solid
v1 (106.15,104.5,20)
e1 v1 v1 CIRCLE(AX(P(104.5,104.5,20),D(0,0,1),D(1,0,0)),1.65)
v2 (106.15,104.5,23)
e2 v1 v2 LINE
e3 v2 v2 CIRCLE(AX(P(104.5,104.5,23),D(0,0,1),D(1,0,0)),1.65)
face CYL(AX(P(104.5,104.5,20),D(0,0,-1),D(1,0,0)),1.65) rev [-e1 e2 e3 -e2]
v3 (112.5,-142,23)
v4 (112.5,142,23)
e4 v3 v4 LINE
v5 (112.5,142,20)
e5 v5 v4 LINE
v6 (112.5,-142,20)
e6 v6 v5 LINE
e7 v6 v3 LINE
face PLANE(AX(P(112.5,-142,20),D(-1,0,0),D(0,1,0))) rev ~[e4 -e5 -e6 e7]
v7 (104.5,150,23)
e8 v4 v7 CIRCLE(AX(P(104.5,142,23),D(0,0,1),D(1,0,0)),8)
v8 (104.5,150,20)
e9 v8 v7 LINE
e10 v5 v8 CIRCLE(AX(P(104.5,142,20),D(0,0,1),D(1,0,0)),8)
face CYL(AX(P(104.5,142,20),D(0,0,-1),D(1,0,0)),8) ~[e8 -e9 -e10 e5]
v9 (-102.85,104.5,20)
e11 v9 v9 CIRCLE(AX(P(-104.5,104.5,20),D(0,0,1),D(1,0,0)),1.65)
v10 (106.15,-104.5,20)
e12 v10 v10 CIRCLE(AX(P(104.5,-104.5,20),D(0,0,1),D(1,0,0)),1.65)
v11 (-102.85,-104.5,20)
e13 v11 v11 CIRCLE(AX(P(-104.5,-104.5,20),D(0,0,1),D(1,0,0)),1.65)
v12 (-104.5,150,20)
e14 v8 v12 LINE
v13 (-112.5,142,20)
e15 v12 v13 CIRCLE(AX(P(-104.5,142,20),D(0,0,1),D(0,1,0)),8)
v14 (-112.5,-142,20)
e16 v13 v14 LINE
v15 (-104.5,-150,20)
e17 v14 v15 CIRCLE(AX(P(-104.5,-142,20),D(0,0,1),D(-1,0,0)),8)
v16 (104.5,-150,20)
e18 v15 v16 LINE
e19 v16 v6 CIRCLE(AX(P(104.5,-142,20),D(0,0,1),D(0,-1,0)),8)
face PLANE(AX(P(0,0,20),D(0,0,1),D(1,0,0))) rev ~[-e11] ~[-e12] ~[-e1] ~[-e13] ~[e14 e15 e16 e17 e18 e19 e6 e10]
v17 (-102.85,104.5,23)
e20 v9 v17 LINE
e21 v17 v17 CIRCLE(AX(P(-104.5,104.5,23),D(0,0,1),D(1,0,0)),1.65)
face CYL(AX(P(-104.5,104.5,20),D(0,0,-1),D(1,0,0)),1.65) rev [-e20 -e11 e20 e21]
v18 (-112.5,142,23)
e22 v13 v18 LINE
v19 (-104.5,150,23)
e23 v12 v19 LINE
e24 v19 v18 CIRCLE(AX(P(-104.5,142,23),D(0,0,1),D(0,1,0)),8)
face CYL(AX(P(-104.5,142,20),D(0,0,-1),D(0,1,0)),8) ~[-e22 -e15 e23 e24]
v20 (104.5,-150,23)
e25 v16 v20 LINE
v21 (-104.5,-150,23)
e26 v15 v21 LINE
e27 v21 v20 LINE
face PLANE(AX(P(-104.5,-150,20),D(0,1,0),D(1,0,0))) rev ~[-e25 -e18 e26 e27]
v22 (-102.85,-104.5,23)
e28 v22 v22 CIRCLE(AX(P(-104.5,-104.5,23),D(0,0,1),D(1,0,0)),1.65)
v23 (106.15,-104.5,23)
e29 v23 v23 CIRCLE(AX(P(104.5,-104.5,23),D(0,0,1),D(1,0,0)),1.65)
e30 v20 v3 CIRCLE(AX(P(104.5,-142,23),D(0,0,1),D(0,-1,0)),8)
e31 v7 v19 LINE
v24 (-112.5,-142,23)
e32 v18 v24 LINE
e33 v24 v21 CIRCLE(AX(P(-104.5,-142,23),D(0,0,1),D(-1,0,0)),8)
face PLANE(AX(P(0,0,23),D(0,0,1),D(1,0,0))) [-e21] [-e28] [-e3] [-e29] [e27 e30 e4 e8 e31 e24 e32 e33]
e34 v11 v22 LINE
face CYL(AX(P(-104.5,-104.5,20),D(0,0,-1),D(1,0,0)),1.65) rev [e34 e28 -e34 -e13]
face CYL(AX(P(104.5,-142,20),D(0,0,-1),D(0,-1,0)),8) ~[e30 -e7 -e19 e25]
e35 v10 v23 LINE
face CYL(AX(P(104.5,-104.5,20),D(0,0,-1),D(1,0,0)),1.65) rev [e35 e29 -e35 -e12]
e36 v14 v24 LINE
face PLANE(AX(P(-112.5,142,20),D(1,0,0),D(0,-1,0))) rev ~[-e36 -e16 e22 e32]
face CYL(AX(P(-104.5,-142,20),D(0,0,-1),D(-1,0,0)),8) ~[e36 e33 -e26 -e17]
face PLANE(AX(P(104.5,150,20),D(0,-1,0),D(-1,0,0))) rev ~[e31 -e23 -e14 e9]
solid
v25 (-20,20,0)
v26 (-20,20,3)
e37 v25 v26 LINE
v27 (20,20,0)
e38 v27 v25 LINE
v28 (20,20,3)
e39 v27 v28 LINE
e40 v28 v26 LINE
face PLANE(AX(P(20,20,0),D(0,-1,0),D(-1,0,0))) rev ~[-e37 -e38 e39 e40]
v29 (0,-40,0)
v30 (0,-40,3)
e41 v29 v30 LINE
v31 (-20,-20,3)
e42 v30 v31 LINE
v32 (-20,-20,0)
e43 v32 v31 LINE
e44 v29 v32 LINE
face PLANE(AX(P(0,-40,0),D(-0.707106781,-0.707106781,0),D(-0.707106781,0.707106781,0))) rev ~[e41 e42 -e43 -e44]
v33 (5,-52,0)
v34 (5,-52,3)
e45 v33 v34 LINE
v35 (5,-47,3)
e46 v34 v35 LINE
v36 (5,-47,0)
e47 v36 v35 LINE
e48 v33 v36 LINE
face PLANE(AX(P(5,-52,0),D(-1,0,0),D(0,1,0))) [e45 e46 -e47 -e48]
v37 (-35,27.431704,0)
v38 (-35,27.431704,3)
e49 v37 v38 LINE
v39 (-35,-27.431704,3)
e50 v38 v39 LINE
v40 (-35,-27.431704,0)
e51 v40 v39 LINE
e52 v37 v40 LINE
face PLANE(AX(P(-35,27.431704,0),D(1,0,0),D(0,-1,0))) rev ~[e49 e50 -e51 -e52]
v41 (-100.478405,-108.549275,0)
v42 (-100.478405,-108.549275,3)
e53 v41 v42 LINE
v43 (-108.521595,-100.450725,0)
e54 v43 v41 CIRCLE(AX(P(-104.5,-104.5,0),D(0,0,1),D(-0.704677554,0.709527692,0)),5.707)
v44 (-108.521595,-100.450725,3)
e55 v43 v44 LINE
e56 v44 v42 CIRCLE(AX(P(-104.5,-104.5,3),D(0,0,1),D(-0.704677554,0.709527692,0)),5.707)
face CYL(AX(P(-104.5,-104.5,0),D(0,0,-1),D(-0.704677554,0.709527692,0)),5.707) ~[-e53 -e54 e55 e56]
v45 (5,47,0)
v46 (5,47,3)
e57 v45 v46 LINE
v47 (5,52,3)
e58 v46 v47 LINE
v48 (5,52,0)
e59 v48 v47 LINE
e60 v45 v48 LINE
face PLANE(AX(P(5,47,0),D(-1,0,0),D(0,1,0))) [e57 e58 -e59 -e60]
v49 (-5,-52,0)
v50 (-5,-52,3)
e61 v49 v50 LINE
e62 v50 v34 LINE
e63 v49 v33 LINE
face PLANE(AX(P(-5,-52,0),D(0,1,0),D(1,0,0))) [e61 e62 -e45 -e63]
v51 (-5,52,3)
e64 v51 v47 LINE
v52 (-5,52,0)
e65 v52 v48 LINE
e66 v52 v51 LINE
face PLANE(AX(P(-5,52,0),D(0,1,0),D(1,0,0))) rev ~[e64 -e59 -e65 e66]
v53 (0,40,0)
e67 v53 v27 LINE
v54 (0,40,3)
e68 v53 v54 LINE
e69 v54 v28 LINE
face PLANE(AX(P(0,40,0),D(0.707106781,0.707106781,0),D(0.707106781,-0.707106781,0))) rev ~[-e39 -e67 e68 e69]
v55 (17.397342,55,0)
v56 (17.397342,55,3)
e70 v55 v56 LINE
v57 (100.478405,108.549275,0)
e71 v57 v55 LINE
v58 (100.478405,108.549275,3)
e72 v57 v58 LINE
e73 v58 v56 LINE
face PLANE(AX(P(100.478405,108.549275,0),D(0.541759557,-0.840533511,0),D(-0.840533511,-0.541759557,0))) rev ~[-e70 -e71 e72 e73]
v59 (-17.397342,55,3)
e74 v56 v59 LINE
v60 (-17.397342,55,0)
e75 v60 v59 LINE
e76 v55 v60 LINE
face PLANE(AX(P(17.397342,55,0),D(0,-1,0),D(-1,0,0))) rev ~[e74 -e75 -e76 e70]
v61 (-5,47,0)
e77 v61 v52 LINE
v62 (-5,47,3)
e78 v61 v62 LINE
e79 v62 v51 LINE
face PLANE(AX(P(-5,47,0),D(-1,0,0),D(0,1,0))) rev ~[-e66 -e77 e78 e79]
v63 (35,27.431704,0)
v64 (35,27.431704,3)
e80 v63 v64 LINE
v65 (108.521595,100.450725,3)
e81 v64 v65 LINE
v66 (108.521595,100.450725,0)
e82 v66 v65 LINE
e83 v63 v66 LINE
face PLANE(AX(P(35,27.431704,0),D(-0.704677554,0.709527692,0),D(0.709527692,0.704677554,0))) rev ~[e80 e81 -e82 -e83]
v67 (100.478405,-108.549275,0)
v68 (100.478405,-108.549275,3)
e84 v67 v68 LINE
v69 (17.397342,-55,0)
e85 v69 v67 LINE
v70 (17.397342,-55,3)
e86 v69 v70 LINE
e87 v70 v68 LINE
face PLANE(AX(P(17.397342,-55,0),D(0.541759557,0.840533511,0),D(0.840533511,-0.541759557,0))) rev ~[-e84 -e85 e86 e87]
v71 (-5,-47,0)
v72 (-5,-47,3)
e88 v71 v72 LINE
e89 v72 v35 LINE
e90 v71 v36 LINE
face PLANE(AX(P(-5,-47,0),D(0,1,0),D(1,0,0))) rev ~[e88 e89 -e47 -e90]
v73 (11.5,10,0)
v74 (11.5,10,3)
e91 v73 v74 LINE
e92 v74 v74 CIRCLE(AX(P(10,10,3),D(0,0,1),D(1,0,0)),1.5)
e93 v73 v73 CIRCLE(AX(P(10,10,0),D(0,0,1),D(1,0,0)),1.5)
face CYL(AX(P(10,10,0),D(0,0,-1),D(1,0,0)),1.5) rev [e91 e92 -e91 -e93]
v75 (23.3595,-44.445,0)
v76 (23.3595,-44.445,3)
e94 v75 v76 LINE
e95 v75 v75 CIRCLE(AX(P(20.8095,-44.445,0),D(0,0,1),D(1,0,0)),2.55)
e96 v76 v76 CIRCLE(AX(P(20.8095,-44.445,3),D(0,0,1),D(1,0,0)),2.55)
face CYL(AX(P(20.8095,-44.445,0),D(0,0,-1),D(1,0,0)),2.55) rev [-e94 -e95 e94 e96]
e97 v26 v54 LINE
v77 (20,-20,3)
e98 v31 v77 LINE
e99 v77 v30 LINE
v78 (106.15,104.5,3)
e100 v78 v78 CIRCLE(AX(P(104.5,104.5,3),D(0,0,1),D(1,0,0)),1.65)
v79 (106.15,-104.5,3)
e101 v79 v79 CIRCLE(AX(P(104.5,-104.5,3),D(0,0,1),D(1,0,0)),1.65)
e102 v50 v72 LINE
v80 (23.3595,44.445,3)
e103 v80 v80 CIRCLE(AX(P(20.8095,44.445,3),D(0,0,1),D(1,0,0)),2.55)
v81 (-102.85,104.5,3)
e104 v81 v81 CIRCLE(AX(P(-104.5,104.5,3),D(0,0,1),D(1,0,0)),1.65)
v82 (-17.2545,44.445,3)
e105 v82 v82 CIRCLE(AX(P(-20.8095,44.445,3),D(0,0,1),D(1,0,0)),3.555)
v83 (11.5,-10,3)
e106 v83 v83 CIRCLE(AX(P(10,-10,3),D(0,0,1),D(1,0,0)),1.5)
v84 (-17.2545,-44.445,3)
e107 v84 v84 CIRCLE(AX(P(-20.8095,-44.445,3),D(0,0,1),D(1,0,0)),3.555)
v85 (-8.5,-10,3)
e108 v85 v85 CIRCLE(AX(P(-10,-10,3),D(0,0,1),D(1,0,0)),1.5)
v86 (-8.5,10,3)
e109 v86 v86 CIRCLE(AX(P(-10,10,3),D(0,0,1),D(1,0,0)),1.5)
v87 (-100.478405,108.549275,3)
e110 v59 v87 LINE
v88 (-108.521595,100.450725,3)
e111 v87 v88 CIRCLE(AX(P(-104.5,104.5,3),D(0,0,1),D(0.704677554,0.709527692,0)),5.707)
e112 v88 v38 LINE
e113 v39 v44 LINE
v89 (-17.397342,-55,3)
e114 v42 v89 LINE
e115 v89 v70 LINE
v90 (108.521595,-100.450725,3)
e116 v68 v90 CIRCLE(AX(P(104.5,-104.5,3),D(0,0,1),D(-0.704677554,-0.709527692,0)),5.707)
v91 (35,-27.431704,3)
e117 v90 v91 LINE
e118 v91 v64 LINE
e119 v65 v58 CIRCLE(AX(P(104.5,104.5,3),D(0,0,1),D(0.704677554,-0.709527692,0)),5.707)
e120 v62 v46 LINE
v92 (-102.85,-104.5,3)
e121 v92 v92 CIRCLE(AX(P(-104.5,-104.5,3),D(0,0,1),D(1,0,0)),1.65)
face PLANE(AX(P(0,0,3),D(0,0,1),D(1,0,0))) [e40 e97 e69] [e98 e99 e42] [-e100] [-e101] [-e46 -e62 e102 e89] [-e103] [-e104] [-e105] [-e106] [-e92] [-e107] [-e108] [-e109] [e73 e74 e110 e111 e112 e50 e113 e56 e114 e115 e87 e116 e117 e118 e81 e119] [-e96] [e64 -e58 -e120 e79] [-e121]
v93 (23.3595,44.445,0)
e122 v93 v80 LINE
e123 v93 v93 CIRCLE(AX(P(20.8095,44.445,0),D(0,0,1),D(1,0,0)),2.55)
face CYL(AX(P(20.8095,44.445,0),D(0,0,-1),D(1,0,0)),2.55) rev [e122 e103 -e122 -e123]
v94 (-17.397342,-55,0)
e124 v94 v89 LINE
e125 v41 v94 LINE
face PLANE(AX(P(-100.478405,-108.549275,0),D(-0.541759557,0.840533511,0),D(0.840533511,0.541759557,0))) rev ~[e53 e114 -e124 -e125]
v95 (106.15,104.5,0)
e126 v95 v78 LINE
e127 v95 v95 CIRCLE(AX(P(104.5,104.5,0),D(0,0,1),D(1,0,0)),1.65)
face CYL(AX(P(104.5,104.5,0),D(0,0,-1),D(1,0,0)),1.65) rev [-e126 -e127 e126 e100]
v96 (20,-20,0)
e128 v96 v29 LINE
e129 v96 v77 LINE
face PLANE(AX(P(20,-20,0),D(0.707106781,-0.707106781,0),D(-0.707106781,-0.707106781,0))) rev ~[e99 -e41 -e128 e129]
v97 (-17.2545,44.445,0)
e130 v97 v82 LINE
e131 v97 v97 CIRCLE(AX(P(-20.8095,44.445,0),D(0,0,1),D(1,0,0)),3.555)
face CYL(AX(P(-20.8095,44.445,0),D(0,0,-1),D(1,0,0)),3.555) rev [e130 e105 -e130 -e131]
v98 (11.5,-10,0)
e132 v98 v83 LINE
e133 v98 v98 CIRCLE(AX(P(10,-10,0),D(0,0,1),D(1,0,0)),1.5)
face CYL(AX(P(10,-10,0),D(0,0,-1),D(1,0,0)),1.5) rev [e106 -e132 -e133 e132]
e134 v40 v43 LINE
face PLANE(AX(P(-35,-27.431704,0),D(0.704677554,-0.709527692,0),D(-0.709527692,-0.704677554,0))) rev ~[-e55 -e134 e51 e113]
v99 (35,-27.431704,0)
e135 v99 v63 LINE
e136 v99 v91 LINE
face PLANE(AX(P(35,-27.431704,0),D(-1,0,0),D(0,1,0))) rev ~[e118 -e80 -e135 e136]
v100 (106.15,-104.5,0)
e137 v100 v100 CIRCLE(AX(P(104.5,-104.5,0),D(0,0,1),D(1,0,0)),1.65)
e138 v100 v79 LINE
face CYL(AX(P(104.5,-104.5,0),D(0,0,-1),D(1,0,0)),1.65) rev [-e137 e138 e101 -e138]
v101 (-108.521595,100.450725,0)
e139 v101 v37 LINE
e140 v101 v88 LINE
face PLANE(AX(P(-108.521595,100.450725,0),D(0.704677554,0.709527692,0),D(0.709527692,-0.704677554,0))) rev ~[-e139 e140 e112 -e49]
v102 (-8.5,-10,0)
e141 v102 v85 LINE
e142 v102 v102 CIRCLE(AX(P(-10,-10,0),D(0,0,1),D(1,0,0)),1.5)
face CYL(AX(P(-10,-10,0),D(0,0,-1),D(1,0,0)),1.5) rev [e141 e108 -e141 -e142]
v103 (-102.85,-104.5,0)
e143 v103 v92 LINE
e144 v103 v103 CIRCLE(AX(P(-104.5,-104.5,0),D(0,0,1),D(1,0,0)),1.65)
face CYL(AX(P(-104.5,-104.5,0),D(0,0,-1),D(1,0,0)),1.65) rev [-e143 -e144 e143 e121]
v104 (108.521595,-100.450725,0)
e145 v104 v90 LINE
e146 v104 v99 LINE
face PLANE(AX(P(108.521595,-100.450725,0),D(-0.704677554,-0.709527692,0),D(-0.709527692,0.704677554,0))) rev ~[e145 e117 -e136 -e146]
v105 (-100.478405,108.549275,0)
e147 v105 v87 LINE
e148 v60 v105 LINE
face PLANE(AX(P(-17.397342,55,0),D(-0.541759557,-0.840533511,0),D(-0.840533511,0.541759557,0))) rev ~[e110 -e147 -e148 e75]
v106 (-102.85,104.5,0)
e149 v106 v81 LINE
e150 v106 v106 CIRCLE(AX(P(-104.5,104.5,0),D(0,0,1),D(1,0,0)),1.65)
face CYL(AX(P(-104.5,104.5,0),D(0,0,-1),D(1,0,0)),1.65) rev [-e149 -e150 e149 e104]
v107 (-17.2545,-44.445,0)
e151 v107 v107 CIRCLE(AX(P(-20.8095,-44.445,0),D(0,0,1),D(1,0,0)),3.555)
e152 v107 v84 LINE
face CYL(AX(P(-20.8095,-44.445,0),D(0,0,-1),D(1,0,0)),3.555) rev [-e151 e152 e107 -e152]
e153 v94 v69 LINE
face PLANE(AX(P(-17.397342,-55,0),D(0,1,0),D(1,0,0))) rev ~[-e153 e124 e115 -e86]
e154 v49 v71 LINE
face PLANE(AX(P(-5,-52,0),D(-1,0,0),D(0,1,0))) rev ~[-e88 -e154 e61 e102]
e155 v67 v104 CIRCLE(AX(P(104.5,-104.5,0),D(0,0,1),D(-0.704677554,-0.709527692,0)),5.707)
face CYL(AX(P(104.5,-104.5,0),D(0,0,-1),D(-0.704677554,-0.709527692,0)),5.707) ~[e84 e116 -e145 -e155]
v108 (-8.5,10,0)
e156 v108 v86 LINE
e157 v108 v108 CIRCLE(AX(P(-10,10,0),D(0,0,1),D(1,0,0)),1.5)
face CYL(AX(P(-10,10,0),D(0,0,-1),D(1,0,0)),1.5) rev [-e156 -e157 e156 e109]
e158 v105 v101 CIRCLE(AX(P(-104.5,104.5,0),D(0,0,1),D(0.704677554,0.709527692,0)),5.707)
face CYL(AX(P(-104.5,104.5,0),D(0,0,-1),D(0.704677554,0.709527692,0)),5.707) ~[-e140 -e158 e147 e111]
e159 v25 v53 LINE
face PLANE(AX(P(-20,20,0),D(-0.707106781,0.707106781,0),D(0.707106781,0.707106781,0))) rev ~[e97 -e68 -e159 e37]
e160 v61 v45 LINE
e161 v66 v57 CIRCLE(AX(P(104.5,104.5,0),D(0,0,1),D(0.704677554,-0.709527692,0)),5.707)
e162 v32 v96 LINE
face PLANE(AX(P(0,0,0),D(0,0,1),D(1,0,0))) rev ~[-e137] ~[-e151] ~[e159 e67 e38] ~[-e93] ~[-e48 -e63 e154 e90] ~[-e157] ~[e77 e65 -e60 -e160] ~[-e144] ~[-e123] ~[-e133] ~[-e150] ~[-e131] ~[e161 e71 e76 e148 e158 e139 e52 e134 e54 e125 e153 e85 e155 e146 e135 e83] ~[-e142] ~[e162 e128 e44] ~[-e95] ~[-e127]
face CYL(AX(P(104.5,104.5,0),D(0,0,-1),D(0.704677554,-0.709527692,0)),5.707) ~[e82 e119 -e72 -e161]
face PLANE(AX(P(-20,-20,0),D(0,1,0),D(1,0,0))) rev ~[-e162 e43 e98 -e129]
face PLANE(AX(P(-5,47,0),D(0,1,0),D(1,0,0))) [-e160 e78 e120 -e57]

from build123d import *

# Parameters (mm, degrees)
F0_R     = 1.65
F0_R_2   = 3.555
F0_R_3   = 1.5
F0_W     = 10
F0_H     = 5
F0_R_4   = 2.55
F1_DEPTH = 3
F3_START = 20
F2_R     = 1.65
F3_DEPTH = 3


# Not quite as in the source:
# - a feature names something its author has since deleted; it is built from what else it names


with BuildPart() as f1:
    # F0 (on Top) → F1 (new body)
    with BuildSketch(Plane.XY):
        with BuildLine():
            Line((-17.3973424224, 55), (-100.4784052001, 108.5492745357))
            ThreePointArc((-100.4784052001, 108.5492745357), (-108.5492745357, 108.5215947999), (-108.5215947999, 100.4507254643))
            Line((-108.5215947999, 100.4507254643), (-35, 27.4317042255))
            Line((-35, 27.4317042255), (-35, -27.4317042255))
            Line((-35, -27.4317042255), (-108.5215947999, -100.4507254643))
            ThreePointArc((-108.5215947999, -100.4507254643), (-108.5492745357, -108.5215947999), (-100.4784052001, -108.5492745357))
            Line((-100.4784052001, -108.5492745357), (-17.3973424224, -55))
            Line((-17.3973424224, -55), (17.3973424224, -55))
            Line((17.3973424224, -55), (100.4784052001, -108.5492745357))
            ThreePointArc((100.4784052001, -108.5492745357), (108.5492745357, -108.5215947999), (108.5215947999, -100.4507254643))
            Line((108.5215947999, -100.4507254643), (35, -27.4317042255))
            Line((35, -27.4317042255), (35, 27.4317042255))
            Line((35, 27.4317042255), (108.5215947999, 100.4507254643))
            ThreePointArc((108.5215947999, 100.4507254643), (108.5492745357, 108.5215947999), (100.4784052001, 108.5492745357))
            Line((100.4784052001, 108.5492745357), (17.3973424224, 55))
            Line((17.3973424224, 55), (-17.3973424224, 55))
        make_face()
        with Locations((-104.5, -104.5)):
            Circle(F0_R, mode=Mode.SUBTRACT)
        with Locations((-20.8095, -44.445)):
            Circle(F0_R_2, mode=Mode.SUBTRACT)
        with Locations((-10, -10)):
            Circle(F0_R_3, mode=Mode.SUBTRACT)
        with Locations((104.5, -104.5)):
            Circle(F0_R, mode=Mode.SUBTRACT)
        with Locations((0, -49.5)):
            Rectangle(F0_W, F0_H, mode=Mode.SUBTRACT)
        with Locations((20.8095, -44.445)):
            Circle(F0_R_4, mode=Mode.SUBTRACT)
        Polygon((0, -40), (-20, -20), (20, -20), align=None, mode=Mode.SUBTRACT)
        with Locations((10, -10)):
            Circle(F0_R_3, mode=Mode.SUBTRACT)
        with Locations((-10, 10)):
            Circle(F0_R_3, mode=Mode.SUBTRACT)
        with Locations((-20.8095, 44.445)):
            Circle(F0_R_2, mode=Mode.SUBTRACT)
        with Locations((-104.5, 104.5)):
            Circle(F0_R, mode=Mode.SUBTRACT)
        with Locations((10, 10)):
            Circle(F0_R_3, mode=Mode.SUBTRACT)
        Polygon((-20, 20), (0, 40), (20, 20), align=None, mode=Mode.SUBTRACT)
        with Locations((0, 49.5)):
            Rectangle(F0_W, F0_H, mode=Mode.SUBTRACT)
        with Locations((20.8095, 44.445)):
            Circle(F0_R_4, mode=Mode.SUBTRACT)
        with Locations((104.5, 104.5)):
            Circle(F0_R, mode=Mode.SUBTRACT)
    extrude(amount=F1_DEPTH)


with BuildPart() as f3:
    # F2 (on Top) → F3 (new body)
    with BuildSketch(Plane.XY.offset(F3_START)):
        with BuildLine():
            Line((104.5, 150), (-104.5, 150))
            ThreePointArc((-104.5, 150), (-110.1568542495, 147.6568542495), (-112.5, 142))
            Line((-112.5, 142), (-112.5, -142))
            ThreePointArc((-112.5, -142), (-110.1568542495, -147.6568542495), (-104.5, -150))
            Line((-104.5, -150), (104.5, -150))
            ThreePointArc((104.5, -150), (110.1568542495, -147.6568542495), (112.5, -142))
            Line((112.5, -142), (112.5, 142))
            ThreePointArc((112.5, 142), (110.1568542495, 147.6568542495), (104.5, 150))
        make_face()
        with Locations((-104.5, -104.5)):
            Circle(F2_R, mode=Mode.SUBTRACT)
        with Locations((104.5, -104.5)):
            Circle(F2_R, mode=Mode.SUBTRACT)
        with Locations((-104.5, 104.5)):
            Circle(F2_R, mode=Mode.SUBTRACT)
        with Locations((104.5, 104.5)):
            Circle(F2_R, mode=Mode.SUBTRACT)
    extrude(amount=F3_DEPTH)


solid = Compound([f1.part, f3.part])
